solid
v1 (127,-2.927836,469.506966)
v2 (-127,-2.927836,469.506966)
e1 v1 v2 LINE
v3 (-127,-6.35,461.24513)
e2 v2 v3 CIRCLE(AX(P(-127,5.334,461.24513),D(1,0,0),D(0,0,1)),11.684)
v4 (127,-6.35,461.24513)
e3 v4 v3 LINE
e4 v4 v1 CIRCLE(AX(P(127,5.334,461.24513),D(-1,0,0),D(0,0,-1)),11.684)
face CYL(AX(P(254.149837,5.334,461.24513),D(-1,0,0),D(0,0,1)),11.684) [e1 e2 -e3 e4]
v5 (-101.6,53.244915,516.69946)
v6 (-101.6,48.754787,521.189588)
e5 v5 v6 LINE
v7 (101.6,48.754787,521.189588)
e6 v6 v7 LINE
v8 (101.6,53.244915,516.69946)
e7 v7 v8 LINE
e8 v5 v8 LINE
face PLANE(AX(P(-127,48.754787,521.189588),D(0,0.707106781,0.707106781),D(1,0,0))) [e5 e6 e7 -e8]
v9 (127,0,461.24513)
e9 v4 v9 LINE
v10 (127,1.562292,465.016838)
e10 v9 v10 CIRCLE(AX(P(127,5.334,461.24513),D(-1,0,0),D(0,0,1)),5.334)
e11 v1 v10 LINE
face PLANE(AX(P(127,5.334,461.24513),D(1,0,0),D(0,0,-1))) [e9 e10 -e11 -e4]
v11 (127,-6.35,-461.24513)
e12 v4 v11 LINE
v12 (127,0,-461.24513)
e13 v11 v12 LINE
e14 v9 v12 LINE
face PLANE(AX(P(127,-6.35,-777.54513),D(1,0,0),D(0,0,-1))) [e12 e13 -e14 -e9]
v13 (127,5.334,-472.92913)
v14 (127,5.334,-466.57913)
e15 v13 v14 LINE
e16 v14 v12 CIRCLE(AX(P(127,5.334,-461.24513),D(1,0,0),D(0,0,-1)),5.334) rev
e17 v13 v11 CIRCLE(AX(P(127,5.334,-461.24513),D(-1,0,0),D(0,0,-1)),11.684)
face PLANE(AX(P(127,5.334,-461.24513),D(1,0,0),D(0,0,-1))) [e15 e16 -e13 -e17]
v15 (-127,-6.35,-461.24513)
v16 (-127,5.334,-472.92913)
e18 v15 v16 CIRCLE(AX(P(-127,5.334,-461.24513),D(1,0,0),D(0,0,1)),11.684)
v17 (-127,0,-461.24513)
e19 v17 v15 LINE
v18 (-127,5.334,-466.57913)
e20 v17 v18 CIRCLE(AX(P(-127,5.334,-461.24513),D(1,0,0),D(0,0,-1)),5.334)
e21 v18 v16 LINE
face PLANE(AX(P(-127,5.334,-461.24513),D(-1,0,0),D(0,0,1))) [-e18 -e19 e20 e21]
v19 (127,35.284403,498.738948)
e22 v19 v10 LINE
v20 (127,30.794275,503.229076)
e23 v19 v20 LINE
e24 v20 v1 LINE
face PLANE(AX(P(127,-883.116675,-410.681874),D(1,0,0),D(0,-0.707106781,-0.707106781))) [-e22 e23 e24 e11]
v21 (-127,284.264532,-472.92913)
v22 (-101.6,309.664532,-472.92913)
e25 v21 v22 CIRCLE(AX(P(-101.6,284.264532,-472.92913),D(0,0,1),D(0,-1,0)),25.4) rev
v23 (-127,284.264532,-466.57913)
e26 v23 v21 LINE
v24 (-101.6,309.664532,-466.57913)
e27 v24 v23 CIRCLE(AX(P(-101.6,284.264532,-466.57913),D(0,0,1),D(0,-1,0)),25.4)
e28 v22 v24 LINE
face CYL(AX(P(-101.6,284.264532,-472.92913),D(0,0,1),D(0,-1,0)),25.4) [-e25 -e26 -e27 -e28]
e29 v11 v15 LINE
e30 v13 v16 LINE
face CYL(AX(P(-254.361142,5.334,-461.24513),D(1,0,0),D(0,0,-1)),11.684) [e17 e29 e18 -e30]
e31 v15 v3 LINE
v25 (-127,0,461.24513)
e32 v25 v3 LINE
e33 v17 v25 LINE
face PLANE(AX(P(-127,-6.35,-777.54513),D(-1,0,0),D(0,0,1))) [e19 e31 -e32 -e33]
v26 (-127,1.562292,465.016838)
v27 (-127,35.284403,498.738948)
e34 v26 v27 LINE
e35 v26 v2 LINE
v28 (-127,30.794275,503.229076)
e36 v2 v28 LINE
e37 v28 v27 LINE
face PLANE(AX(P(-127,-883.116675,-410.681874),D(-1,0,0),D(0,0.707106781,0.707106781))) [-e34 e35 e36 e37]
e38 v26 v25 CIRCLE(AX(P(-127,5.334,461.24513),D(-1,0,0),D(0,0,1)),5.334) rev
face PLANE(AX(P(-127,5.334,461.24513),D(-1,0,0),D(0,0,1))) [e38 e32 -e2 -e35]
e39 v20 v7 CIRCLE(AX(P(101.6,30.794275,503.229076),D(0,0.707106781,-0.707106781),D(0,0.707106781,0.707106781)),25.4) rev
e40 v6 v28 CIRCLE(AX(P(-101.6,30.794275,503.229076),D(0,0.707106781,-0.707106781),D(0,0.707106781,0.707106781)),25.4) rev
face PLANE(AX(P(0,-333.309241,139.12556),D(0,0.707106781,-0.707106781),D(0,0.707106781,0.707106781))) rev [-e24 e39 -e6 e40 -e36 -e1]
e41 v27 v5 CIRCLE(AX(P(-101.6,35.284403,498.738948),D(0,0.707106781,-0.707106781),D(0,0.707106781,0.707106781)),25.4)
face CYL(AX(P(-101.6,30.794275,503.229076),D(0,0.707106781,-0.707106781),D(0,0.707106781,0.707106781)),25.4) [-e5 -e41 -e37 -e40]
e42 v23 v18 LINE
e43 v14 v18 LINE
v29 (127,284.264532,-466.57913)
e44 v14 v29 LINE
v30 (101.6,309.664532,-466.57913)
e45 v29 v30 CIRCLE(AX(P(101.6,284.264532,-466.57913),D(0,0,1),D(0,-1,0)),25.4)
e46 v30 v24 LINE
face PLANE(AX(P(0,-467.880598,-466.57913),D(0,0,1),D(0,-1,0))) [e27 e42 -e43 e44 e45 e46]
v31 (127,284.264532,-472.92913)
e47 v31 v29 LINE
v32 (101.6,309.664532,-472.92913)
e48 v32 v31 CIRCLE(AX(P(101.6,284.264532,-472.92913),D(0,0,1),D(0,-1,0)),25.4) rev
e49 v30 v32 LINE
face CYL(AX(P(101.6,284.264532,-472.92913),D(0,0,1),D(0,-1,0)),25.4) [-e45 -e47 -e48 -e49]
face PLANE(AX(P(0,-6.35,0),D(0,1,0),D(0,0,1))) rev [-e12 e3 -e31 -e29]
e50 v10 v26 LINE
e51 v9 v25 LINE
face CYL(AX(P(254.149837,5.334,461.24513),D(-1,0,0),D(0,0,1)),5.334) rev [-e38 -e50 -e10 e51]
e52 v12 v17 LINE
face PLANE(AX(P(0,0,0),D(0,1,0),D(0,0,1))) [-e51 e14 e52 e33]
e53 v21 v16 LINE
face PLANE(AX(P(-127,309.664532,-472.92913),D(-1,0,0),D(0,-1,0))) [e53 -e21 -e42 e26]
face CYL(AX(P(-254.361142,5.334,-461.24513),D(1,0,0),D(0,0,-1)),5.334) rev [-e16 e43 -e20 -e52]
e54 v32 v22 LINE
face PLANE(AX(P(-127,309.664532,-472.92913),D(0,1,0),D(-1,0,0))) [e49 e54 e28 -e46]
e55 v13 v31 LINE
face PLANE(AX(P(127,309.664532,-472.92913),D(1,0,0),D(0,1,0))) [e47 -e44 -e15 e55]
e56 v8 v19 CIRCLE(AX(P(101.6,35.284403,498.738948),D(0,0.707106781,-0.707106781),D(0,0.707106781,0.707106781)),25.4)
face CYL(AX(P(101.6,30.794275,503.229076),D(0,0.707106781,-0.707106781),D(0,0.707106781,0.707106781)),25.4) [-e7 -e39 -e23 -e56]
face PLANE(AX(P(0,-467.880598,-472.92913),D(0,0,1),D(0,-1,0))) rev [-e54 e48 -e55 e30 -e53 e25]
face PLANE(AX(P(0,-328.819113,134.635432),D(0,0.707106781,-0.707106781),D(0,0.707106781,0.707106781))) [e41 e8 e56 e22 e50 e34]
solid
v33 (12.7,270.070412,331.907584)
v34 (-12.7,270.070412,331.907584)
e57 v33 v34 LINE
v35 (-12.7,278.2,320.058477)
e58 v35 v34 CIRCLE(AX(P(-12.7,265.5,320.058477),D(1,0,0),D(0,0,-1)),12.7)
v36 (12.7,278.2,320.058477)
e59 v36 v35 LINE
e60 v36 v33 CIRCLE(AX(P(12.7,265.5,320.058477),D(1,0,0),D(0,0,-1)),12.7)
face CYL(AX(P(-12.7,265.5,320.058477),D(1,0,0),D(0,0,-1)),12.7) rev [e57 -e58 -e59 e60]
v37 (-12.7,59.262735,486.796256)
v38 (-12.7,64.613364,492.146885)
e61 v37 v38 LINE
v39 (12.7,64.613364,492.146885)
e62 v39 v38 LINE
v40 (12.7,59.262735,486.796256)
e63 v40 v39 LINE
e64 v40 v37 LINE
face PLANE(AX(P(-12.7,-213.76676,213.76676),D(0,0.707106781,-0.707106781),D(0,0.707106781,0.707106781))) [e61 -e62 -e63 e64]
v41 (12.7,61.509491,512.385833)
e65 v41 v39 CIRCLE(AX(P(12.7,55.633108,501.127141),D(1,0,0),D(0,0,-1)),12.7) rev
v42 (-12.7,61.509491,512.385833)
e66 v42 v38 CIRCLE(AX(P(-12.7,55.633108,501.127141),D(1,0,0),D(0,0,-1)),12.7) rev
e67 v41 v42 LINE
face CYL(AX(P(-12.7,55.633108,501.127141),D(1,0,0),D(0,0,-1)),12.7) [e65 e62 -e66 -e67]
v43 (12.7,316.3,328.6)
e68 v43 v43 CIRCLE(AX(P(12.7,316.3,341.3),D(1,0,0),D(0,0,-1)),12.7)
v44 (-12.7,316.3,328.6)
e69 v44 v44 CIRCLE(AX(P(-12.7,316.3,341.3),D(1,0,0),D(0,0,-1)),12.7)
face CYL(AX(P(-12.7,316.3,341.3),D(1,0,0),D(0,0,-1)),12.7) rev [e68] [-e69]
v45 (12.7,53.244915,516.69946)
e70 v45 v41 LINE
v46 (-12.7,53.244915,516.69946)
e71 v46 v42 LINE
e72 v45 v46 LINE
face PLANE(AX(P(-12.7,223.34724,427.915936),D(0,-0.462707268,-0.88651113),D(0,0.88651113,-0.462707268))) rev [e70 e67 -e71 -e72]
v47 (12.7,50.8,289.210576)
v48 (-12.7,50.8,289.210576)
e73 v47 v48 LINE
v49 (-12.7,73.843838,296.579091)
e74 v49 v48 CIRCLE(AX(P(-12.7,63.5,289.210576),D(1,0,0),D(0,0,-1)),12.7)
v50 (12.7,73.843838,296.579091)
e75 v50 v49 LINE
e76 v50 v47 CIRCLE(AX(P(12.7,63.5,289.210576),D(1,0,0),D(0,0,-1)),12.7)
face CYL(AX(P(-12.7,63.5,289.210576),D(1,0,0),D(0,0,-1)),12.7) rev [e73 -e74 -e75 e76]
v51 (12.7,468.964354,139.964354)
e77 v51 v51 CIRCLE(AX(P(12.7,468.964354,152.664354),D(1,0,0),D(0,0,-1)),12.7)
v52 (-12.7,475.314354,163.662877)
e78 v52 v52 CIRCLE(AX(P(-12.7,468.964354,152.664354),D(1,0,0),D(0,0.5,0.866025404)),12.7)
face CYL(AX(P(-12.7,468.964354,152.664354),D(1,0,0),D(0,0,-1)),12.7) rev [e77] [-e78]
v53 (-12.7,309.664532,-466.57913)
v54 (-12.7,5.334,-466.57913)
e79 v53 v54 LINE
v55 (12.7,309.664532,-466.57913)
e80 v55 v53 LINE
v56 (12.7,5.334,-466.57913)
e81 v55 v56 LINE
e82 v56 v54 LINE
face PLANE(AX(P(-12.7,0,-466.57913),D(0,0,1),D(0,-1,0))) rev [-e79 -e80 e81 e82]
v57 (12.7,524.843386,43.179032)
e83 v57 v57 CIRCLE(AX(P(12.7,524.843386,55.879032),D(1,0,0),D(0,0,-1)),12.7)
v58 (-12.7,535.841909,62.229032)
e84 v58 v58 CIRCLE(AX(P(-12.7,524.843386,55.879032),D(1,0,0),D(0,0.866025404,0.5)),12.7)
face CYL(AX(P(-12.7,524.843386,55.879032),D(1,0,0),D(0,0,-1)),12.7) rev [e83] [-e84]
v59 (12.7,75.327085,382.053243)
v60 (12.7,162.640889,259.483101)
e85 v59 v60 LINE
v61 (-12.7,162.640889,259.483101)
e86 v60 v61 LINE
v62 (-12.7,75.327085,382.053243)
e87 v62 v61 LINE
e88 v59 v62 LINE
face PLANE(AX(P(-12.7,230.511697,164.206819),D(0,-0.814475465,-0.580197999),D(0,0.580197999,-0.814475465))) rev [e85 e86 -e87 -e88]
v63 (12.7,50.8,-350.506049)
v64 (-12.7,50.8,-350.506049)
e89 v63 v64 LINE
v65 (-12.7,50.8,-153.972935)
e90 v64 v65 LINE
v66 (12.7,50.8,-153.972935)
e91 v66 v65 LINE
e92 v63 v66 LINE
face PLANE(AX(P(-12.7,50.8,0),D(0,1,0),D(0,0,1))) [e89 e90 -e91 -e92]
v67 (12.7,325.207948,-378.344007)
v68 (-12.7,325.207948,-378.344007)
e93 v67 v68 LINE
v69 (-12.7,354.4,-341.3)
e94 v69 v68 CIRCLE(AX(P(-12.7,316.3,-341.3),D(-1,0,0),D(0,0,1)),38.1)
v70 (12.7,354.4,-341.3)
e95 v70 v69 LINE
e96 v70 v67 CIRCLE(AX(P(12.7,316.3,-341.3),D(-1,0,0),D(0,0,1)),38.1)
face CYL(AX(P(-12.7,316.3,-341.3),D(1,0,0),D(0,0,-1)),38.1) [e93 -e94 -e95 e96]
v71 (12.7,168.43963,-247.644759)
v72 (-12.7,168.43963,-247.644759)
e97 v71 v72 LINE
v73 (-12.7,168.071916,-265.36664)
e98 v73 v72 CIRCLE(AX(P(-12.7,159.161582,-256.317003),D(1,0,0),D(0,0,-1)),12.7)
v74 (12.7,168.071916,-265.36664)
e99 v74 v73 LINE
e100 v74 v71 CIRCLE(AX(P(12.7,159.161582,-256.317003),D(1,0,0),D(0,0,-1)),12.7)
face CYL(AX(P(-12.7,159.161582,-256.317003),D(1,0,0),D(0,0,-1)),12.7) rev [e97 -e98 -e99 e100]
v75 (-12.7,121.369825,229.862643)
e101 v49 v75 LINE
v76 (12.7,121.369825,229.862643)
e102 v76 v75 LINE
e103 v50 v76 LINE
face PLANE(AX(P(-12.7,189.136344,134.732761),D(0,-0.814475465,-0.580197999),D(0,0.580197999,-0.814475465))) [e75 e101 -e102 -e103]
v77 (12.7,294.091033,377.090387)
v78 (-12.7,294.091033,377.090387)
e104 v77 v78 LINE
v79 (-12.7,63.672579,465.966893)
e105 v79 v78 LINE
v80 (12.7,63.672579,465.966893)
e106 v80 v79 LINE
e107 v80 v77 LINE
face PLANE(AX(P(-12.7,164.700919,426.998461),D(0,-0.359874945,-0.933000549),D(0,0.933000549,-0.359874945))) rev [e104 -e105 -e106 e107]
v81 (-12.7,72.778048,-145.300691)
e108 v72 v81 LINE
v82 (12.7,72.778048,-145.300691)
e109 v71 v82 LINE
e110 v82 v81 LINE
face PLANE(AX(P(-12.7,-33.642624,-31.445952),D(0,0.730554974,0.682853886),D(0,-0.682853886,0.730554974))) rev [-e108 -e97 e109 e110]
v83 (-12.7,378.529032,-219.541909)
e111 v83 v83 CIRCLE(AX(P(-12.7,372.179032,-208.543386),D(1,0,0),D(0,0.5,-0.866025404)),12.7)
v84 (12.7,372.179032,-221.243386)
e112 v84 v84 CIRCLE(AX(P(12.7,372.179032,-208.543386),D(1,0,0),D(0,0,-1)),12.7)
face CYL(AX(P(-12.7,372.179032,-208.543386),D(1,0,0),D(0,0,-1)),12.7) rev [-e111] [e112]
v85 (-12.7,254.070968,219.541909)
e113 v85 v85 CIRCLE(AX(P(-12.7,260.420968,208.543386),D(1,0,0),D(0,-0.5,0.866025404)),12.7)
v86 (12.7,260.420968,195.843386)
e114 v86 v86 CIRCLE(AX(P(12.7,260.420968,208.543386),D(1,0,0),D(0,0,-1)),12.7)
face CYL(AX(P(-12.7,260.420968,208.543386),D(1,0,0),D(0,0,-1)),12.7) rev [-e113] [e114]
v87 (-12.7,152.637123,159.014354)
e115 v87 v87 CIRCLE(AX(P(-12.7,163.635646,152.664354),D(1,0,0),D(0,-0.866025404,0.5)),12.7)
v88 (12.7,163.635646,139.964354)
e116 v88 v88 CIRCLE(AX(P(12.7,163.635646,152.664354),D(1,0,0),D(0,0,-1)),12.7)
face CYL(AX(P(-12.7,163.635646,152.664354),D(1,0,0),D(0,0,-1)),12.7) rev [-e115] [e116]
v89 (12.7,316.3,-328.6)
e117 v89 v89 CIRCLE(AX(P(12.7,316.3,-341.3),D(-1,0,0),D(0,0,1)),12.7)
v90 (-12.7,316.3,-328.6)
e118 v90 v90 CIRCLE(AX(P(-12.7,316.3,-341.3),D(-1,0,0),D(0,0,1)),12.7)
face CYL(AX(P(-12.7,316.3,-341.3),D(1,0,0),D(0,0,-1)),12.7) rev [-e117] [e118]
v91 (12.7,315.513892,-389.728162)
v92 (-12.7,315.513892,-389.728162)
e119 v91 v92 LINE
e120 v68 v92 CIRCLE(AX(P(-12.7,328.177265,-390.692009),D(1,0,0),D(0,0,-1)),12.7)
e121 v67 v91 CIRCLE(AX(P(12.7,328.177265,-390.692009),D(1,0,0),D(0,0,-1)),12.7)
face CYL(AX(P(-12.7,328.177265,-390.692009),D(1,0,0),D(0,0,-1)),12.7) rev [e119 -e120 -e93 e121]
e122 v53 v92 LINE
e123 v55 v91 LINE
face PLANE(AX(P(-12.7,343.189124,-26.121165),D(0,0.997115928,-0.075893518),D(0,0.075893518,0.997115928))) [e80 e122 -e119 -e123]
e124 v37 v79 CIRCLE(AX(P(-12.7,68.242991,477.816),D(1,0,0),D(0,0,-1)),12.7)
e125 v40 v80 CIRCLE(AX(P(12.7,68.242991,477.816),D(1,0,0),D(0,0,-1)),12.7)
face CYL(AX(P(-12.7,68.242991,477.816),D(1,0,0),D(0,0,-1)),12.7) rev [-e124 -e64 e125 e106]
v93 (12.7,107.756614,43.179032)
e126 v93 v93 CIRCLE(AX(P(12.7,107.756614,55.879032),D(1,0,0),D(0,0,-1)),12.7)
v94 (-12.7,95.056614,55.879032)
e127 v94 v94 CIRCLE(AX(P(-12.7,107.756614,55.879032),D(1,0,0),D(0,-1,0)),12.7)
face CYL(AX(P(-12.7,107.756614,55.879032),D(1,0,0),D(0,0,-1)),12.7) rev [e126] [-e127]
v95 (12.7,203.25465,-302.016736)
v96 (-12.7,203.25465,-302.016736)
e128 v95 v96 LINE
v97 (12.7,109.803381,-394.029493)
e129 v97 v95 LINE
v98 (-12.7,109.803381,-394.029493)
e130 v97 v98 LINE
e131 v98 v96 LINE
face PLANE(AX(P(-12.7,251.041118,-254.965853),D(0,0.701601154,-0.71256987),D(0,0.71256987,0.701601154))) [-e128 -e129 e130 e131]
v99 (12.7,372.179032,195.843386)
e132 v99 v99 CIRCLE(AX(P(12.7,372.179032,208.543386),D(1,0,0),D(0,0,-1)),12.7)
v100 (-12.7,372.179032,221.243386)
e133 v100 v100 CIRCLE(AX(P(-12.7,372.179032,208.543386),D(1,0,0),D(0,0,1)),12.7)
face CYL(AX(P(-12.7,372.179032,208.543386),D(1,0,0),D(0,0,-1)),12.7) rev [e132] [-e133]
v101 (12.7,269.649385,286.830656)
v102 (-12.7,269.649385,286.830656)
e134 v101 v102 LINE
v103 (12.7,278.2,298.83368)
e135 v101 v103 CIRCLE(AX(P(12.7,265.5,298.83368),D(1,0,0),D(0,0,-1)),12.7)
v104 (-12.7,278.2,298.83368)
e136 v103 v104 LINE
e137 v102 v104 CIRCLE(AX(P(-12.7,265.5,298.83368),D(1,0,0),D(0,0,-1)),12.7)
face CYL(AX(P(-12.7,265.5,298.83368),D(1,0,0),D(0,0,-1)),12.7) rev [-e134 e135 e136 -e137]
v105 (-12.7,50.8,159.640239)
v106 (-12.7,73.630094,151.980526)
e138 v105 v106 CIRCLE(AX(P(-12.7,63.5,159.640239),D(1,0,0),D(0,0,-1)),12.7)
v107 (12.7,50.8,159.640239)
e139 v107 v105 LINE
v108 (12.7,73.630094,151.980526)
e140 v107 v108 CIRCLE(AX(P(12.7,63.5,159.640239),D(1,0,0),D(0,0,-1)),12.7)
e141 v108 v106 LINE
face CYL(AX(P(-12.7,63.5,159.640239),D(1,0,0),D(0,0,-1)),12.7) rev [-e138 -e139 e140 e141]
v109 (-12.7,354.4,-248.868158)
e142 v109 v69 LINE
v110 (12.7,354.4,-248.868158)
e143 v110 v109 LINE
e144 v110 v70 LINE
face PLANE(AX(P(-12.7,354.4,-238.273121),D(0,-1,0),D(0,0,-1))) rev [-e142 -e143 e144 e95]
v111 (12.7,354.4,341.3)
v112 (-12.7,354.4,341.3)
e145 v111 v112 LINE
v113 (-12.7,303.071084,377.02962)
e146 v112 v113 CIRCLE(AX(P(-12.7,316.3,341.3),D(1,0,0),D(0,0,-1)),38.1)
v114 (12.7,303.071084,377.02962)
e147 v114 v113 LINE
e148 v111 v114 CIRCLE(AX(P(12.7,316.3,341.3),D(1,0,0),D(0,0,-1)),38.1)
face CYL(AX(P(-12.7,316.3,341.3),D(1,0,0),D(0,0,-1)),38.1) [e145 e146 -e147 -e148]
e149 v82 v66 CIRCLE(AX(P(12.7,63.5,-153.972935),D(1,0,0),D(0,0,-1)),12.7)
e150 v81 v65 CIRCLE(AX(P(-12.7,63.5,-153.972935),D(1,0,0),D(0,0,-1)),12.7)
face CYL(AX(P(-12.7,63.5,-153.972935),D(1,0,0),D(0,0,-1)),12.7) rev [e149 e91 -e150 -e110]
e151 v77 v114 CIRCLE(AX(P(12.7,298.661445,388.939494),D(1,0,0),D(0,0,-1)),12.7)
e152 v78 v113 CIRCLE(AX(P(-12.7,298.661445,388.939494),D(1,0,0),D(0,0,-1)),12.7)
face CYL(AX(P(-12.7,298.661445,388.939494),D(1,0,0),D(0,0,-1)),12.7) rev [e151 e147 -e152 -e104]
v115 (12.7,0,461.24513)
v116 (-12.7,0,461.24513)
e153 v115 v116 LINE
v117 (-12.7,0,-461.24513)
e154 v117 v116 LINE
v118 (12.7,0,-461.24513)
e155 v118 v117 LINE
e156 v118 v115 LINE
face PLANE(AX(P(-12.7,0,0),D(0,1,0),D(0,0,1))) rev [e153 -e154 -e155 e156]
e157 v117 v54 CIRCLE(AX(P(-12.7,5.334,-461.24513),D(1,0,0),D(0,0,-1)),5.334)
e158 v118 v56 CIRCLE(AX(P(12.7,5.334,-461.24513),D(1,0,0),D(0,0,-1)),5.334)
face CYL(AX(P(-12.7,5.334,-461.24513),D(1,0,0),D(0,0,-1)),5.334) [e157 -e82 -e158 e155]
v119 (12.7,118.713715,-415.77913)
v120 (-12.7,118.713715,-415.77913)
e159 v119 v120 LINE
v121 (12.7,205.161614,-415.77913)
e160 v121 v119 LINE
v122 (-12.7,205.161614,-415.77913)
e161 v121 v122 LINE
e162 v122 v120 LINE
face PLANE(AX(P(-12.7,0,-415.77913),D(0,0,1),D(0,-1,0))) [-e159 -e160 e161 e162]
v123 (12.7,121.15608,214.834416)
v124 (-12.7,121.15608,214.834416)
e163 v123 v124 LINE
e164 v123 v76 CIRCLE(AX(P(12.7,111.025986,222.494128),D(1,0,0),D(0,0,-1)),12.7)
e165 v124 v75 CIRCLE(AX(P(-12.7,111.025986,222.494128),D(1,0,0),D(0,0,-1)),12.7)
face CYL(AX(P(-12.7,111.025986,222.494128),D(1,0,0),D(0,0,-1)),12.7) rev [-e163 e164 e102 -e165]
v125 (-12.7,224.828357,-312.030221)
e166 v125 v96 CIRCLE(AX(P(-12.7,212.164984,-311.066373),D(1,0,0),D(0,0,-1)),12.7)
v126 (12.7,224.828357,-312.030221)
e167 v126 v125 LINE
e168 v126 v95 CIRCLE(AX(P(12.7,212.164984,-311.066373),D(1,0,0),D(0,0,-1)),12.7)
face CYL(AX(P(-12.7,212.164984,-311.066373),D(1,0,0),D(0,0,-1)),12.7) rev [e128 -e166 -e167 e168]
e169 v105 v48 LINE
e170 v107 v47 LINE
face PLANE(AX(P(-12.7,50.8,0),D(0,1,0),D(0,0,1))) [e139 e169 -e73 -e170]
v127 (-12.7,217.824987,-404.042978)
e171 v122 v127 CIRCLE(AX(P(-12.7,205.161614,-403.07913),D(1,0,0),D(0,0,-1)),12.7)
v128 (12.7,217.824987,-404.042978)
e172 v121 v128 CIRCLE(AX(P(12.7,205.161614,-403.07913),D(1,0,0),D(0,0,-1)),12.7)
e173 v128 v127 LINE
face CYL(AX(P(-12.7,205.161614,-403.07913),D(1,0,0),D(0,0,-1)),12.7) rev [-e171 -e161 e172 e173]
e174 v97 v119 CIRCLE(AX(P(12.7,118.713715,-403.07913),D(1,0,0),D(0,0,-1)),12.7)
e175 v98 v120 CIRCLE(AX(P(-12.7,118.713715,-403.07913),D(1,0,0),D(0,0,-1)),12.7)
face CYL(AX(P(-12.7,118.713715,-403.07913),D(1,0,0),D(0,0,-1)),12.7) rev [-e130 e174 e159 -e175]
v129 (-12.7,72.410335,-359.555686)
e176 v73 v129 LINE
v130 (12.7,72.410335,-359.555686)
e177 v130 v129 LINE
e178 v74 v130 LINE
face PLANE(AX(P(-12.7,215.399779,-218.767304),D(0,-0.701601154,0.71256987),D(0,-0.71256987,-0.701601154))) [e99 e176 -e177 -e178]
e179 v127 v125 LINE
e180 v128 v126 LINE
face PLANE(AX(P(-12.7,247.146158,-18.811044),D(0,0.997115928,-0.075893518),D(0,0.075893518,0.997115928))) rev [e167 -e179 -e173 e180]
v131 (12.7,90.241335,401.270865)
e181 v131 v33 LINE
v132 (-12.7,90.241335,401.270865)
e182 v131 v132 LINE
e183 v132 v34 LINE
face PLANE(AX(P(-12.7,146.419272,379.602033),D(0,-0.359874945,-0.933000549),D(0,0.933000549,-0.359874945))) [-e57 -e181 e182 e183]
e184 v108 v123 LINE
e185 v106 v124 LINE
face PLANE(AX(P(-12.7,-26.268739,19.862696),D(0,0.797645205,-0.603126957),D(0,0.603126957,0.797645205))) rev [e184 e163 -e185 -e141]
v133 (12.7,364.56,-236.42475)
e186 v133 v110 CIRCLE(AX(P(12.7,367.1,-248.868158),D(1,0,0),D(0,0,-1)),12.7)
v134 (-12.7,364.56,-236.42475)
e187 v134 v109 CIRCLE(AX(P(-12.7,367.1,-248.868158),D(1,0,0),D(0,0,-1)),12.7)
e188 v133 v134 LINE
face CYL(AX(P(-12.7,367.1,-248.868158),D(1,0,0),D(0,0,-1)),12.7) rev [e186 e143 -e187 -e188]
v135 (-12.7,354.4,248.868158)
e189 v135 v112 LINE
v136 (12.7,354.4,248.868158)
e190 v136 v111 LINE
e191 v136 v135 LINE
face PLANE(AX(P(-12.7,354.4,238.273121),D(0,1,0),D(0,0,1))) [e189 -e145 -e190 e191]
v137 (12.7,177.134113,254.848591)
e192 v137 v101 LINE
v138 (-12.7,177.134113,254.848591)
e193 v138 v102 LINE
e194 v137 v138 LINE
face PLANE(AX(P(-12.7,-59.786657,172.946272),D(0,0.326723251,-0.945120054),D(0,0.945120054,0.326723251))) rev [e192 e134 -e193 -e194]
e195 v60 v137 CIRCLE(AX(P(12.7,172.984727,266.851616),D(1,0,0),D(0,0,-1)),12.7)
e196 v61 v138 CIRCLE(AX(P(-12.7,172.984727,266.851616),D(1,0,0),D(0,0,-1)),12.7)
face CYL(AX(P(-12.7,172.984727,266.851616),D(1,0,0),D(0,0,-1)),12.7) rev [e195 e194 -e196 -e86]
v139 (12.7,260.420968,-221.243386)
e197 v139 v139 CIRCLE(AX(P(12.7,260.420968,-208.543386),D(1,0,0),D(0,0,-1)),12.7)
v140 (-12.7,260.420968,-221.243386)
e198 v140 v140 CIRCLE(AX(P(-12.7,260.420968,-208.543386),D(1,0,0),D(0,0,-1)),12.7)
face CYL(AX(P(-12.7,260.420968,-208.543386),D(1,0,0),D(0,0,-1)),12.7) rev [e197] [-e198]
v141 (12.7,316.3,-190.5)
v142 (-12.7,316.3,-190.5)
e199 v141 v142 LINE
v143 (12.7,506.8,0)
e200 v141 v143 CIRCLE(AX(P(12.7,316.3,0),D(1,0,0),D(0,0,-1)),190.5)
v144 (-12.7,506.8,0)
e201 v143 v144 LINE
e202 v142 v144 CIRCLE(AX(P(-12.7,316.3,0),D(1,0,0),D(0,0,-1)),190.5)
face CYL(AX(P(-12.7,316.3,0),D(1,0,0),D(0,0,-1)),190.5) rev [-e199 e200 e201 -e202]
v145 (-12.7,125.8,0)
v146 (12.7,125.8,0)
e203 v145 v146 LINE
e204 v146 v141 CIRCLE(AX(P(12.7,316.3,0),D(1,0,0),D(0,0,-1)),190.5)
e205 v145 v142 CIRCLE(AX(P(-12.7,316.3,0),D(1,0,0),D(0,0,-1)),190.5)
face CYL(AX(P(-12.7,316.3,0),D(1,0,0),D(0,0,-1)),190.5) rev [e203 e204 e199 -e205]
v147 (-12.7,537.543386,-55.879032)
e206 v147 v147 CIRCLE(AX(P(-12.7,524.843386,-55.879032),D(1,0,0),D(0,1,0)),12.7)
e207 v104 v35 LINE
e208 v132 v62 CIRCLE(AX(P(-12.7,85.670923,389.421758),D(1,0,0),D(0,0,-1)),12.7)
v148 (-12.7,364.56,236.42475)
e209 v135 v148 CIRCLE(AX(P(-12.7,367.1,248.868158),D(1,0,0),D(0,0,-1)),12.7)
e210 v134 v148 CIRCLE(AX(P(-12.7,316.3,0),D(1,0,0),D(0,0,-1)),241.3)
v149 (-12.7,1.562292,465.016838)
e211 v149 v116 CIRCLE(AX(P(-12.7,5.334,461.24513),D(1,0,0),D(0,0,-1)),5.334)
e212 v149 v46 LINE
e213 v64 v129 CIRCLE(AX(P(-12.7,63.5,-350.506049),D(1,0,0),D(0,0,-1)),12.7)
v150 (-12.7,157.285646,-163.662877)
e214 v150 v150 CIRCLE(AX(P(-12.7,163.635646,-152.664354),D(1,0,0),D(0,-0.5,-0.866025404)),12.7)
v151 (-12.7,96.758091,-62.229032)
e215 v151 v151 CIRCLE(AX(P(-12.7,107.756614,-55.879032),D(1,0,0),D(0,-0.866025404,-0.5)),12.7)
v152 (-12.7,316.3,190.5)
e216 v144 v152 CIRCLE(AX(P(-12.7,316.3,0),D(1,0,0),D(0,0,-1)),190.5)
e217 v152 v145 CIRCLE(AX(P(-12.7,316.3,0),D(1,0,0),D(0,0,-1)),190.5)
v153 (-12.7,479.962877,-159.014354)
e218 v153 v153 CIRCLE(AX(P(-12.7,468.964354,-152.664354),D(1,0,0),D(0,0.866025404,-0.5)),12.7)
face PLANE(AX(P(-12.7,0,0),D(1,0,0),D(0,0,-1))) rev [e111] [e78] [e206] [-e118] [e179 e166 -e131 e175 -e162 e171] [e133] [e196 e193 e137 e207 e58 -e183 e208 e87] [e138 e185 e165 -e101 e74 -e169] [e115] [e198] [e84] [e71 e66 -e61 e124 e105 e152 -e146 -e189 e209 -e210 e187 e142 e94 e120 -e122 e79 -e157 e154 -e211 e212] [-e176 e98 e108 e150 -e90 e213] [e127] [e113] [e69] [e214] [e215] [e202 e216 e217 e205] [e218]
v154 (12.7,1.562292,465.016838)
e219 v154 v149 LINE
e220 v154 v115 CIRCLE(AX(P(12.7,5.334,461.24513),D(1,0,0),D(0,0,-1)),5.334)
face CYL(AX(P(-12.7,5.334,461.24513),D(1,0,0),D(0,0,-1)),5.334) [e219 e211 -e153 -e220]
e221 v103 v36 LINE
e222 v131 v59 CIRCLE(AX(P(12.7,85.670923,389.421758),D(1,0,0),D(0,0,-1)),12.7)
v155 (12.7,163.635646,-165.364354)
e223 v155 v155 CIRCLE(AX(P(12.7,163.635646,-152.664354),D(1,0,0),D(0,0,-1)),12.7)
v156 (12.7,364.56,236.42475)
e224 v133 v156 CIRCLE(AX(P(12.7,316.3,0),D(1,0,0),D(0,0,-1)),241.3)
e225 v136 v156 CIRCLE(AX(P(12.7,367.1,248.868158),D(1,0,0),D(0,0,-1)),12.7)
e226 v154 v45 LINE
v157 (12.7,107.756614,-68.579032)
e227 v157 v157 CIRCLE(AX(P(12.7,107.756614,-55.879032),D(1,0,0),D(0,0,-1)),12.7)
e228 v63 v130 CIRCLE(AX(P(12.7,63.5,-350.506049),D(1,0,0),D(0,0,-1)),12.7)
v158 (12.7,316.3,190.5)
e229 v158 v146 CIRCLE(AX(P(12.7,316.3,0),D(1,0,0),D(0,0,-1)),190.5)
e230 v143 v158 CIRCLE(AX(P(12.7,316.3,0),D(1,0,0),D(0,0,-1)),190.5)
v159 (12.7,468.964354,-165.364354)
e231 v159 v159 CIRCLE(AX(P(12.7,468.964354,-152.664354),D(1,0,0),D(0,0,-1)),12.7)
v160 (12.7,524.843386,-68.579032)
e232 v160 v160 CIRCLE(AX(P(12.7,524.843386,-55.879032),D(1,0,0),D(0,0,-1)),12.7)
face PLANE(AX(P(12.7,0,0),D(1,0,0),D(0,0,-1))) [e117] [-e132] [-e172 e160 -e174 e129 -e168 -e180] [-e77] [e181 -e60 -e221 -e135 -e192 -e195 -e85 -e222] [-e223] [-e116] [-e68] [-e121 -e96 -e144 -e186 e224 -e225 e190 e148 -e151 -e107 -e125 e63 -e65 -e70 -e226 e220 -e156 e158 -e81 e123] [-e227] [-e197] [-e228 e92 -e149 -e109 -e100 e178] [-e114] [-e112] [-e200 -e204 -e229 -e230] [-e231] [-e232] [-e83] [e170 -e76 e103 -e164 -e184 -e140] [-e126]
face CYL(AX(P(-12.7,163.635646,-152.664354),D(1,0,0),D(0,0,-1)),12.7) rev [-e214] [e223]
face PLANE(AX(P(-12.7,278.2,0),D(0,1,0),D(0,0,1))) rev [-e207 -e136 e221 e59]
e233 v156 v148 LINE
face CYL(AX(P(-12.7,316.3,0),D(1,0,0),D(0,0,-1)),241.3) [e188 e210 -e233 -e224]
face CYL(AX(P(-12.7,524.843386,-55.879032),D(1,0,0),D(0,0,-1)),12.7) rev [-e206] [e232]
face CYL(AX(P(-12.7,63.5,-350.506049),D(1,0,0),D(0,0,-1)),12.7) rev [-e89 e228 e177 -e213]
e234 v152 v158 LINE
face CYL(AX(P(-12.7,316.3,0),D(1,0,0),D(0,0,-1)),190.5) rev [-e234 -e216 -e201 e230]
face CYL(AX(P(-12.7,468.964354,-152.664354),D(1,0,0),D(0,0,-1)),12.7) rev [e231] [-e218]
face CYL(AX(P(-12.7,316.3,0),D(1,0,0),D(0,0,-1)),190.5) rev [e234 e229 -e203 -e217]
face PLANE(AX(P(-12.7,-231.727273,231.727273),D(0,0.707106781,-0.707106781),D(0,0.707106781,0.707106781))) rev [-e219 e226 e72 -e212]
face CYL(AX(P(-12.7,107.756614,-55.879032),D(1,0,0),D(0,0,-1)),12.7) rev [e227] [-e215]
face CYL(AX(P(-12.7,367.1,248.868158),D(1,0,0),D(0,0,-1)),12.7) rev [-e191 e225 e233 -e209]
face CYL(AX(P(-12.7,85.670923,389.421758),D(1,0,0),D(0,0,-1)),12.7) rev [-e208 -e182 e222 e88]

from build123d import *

# Parameters (mm, degrees)
FLANGE_PROFILE_DEPTH                = 12.7
F_7_8_1_DIAMETER_HOLE1_D            = 25.4
BOLT_PATTERN_COUNT                  = 12
SKETCH15_R                          = 12.7
BOSS_EXTRUDE1_DEPTH                 = 12.7
SKETCH5_W                           = 254
SKETCH5_H                           = 1317.865260112
BASE_SKID_DEPTH                     = 6.35
BEND_START                          = -127
BEND_HEEL_DEPTH                     = 254
BEND_HEEL_2_DEPTH                   = 254
BEND_TOE_DEPTH                      = 254
BEND_TOE_2_DEPTH                    = 254
WEBBING_BODY_DEPTH                  = 12.7
WEBBING_HOLES_DEPTH                 = 774.747599071
WEBBING_HOLES_DEPTH_BACK            = 774.747599071
WEBBING_FILLET_R                    = 12.7
SKID_START                          = -472.929130056
SKID_EDGES_DEPTH                    = 6.35
SKID_START_2                        = -334.061851681
SKID_EDGES_2_DEPTH                  = 6.35
FLANGE_FILLET_R                     = 12.7
FILLET1_R                           = 12.7
CONVERT_START                       = -12.7
CONVERT_FLANGE_TO_SHEET_OUTLINE_R   = 12.7
CONVERT_FLANGE_TO_SHEET_OUTLINE_R_2 = 190.5
CONVERT_FLANGE_TO_SHEET_DEPTH       = 25.4


# Read off the part's stored shape, not the designer's step: Bend Heel, Bend Toe, Skid Edges, Convert Flange to Sheet
# Sheet-metal steps are written as plain solids
with BuildPart() as part:
    # Sketch1 → Flange Profile (new, symmetric)
    with BuildSketch(Plane(origin=(0, 0, 0), x_dir=(0, 0, -1), z_dir=(1, 0, 0))):
        with BuildLine():
            ThreePointArc((-190.5, 316.3), (0, 506.8), (190.5, 316.3))
            Line((190.5, 316.3), (241.3, 316.3))
            ThreePointArc((241.3, 316.3), (0, 557.6), (-241.3, 316.3))
            Line((-241.3, 316.3), (-190.5, 316.3))
        make_face()
        with BuildLine():
            Line((241.3, 316.3), (190.5, 316.3))
            ThreePointArc((190.5, 316.3), (0, 125.8), (-190.5, 316.3))
            Line((-190.5, 316.3), (-241.3, 316.3))
            ThreePointArc((-241.3, 316.3), (0, 75), (241.3, 316.3))
        make_face()
    extrude(amount=FLANGE_PROFILE_DEPTH, both=True)

    # 7/8 (1) Diameter Hole1 (through all)
    with Locations(Plane(origin=(12.7, 260.420968162, -208.543385896), x_dir=(0, 0, 1), z_dir=(1, 0, 0))):
        with Locations((0, 0)):
            f_7_8_1_diameter_hole1 = Hole(F_7_8_1_DIAMETER_HOLE1_D / 2)

    # Bolt Pattern: 7/8 (1) Diameter Hole1 ×12 about axis
    bolt_pattern_axis = Axis((0, 316.3, 0), (1, 0, 0))
    for i in range(1, BOLT_PATTERN_COUNT):
        add(f_7_8_1_diameter_hole1.rotate(bolt_pattern_axis, i * 360 / BOLT_PATTERN_COUNT), mode=Mode.SUBTRACT)

    # Sketch15 → Boss-Extrude1 (add, symmetric)
    with BuildSketch(Plane(origin=(0, 0, 0), x_dir=(0, 0, -1), z_dir=(1, 0, 0))):
        with BuildLine():
            Line((-238.273120599, 278.2), (-341.3, 278.2))
            ThreePointArc((-341.3, 278.2), (-379.4, 316.3), (-341.3, 354.4))
            Line((-341.3, 354.4), (-238.273120599, 354.4))
            ThreePointArc((-238.273120599, 354.4), (-200.173120599, 316.3), (-238.273120599, 278.2))
        make_face()
        with Locations((-341.3, 316.3)):
            Circle(SKETCH15_R, mode=Mode.SUBTRACT)
    boss_extrude1 = extrude(amount=BOSS_EXTRUDE1_DEPTH, both=True)

    # Mirror2: Boss-Extrude1 across plane
    add(boss_extrude1.mirror(Plane.XY))

    # Sketch12 → Webbing Body (add, symmetric)
    with BuildSketch(Plane(origin=(0, 0, 0), x_dir=(0, 0, -1), z_dir=(1, 0, 0))):
        with BuildLine():
            Line((-516.69946035, 53.244915153), (-465.016837626, 1.562292429))
            ThreePointArc((-465.016837626, 1.562292429), (-463.286363484, 0.406026574), (-461.245130056, 0))
            Line((-461.245130056, 0), (461.245130056, 0))
            ThreePointArc((461.245130056, 0), (465.016837626, 1.562292429), (466.579130056, 5.334))
            Line((466.579130056, 5.334), (466.579130056, 309.66453199))
            Line((466.579130056, 309.66453199), (379.4, 316.3))
            ThreePointArc((379.4, 316.3), (368.240768363, 289.359231637), (341.3, 278.2))
            Line((341.3, 278.2), (238.273120599, 278.2))
            ThreePointArc((238.273120599, 278.2), (0, 75), (-238.273120599, 278.2))
            Line((-238.273120599, 278.2), (-341.3, 278.2))
            ThreePointArc((-341.3, 278.2), (-368.240768363, 289.359231637), (-379.4, 316.3))
            Line((-379.4, 316.3), (-516.69946035, 53.244915153))
        make_face()
    extrude(amount=WEBBING_BODY_DEPTH, both=True)

    # Sketch13 → Webbing Holes (cut, two sides: drawn at the far end of the back side and taken through both)
    with BuildSketch(Plane(origin=(0, 0, 0), x_dir=(0, 0, -1), z_dir=(1, 0, 0)).offset(-WEBBING_HOLES_DEPTH_BACK)):
        Polygon((-121.787355666, 50.8), (-328.927773528, 50.8), (-222.270083081, 126.778444056), align=None)
        Polygon((256.684840666, 176.88944598), (380.833369116, 50.8), (121.787355666, 50.8), align=None)
        Polygon((415.779130056, 216.93171249), (415.779130056, 87.713713005), (278.243059213, 227.4), align=None)
        Polygon((-416.484090731, 50.8), (-251.744141406, 168.15379766), (-289.7865603, 278.2), (-328.771856678, 278.2), align=None)
        with BuildLine():
            Line((-504.380536196, 76.847015483), (-379.4, 316.3))
            ThreePointArc((-379.4, 316.3), (-378.339738675, 307.374320256), (-375.217965412, 298.945414949))
            Line((-375.217965412, 298.945414949), (-472.992285501, 45.458764788))
            Line((-472.992285501, 45.458764788), (-504.380536196, 76.847015483))
        make_face()
    extrude(amount=WEBBING_HOLES_DEPTH + WEBBING_HOLES_DEPTH_BACK, mode=Mode.SUBTRACT)

    # Webbing Fillet
    webbing_fillet_edges = [part.edges().sort_by_distance(p)[0] for p in [
        (0, 50.8, 416.484090731),
        (0, 278.2, 328.771856678),
        (0, 278.2, 289.7865603),
        (0, 168.15379766, 251.744141406),
        (0, 176.88944598, -256.684840666),
        (0, 50.8, -380.833369116),
        (0, 50.8, -121.787355666),
        (0, 216.93171249, -415.779130056),
        (0, 87.713713005, -415.779130056),
        (0, 227.4, -278.243059213),
        (0, 50.8, 121.787355666),
        (0, 50.8, 328.927773528),
        (0, 126.778444056, 222.270083081),
    ]]
    fillet(webbing_fillet_edges, radius=WEBBING_FILLET_R)

    # Flange Fillet
    flange_fillet_edges = [part.edges().sort_by_distance(p)[0] for p in [
        (0, 298.945414949, 375.217965412),
        (0, 354.4, 238.273120599),
        (0, 354.4, -238.273120599),
        (0, 316.3, -379.4),
    ]]
    fillet(flange_fillet_edges, radius=FLANGE_FILLET_R)

    # Fillet1
    fillet1_edges = [part.edges().sort_by_distance(p)[0] for p in [
        (0, 76.847015483, 504.380536196),
        (0, 45.458764788, 472.992285501),
    ]]
    fillet(fillet1_edges, radius=FILLET1_R)


with BuildPart() as body_2:
    # Sketch5 → Base Skid (new body)
    with BuildSketch(Plane(origin=(0, 0, 0), x_dir=(1, 0, 0), z_dir=(0, 1, 0))):
        with Locations((0, 118.6125)):
            Rectangle(SKETCH5_W, SKETCH5_H)
    extrude(amount=-BASE_SKID_DEPTH)

    # Bend Heel outline → Bend Heel (cut)
    with BuildSketch(Plane.YZ.offset(BEND_START)):
        with BuildLine():
            Line((0, -777.545130056), (0, -471.640528076))
            ThreePointArc((0, -471.640528076), (-4.636915504, -467.33583609), (-6.35, -461.245130056))
            Line((-6.35, -461.245130056), (-6.35, -777.545130056))
            Line((-6.35, -777.545130056), (0, -777.545130056))
        make_face()
    extrude(amount=BEND_HEEL_DEPTH, mode=Mode.SUBTRACT)

    # Bend Heel 2 outline → Bend Heel 2 (add)
    with BuildSketch(Plane.YZ.offset(BEND_START)):
        with BuildLine():
            Line((5.334, -472.929130056), (309.66453199, -472.929130056))
            Line((309.66453199, -472.929130056), (309.66453199, -466.579130056))
            Line((309.66453199, -466.579130056), (5.334, -466.579130056))
            ThreePointArc((5.334, -466.579130056), (1.56229243, -465.016837626), (0, -461.245130056))
            Line((0, -461.245130056), (0, -471.640528076))
            ThreePointArc((0, -471.640528076), (2.590277571, -472.602411563), (5.334, -472.929130056))
        make_face()
    extrude(amount=BEND_HEEL_2_DEPTH)

    # Bend Toe outline → Bend Toe (cut)
    with BuildSketch(Plane.YZ.offset(BEND_START)):
        with BuildLine():
            Line((-6.35, 540.320130056), (-6.35, 461.245130056))
            ThreePointArc((-6.35, 461.245130056), (-5.460608458, 465.71640328), (-2.927835631, 469.506965687))
            Line((-2.927835631, 469.506965687), (0, 472.434801318))
            Line((0, 472.434801318), (0, 540.320130056))
            Line((0, 540.320130056), (-6.35, 540.320130056))
        make_face()
    extrude(amount=BEND_TOE_DEPTH, mode=Mode.SUBTRACT)

    # Bend Toe 2 outline → Bend Toe 2 (add)
    with BuildSketch(Plane.YZ.offset(BEND_START)):
        with BuildLine():
            Line((48.754787092, 521.189588411), (0, 472.434801318))
            Line((0, 472.434801318), (0, 461.245130056))
            ThreePointArc((0, 461.245130056), (0.406026574, 463.286363484), (1.562292429, 465.016837626))
            Line((1.562292429, 465.016837626), (53.244915153, 516.69946035))
            Line((53.244915153, 516.69946035), (48.754787092, 521.189588411))
        make_face()
    extrude(amount=BEND_TOE_2_DEPTH)

    # Skid Edges outline → Skid Edges (cut)
    with BuildSketch(Plane.XY.offset(SKID_START)):
        with BuildLine():
            ThreePointArc((-127, 284.26453199), (-119.560512242, 302.225044232), (-101.6, 309.66453199))
            Line((-101.6, 309.66453199), (-127, 309.66453199))
            Line((-127, 309.66453199), (-127, 284.26453199))
        make_face()
        with BuildLine():
            ThreePointArc((101.6, 309.66453199), (119.560512242, 302.225044232), (127, 284.26453199))
            Line((127, 284.26453199), (127, 309.66453199))
            Line((127, 309.66453199), (101.6, 309.66453199))
        make_face()
    extrude(amount=SKID_EDGES_DEPTH, mode=Mode.SUBTRACT)

    # Skid Edges 2 outline → Skid Edges 2 (cut)
    with BuildSketch(Plane(origin=(0, 0, 0), x_dir=(1, 0, 0), z_dir=(0, 0.707106781186546, -0.707106781186549)).offset(SKID_START_2)):
        with BuildLine():
            Line((-127, -403.011532817), (-101.6, -403.011532817))
            ThreePointArc((-101.6, -403.011532817), (-119.560512242, -395.572045059), (-127, -377.611532817))
            Line((-127, -377.611532817), (-127, -403.011532817))
        make_face()
        with BuildLine():
            ThreePointArc((127, -377.611532817), (119.560512242, -395.572045059), (101.6, -403.011532817))
            Line((101.6, -403.011532817), (127, -403.011532817))
            Line((127, -403.011532817), (127, -377.611532817))
        make_face()
    extrude(amount=SKID_EDGES_2_DEPTH, mode=Mode.SUBTRACT)


with BuildPart() as body_3:
    # Convert Flange to Sheet outline → Convert Flange to Sheet (new body)
    with BuildSketch(Plane.YZ.offset(CONVERT_START)):
        with BuildLine():
            ThreePointArc((64.613364326, 492.146885039), (68.186341854, 503.052322953), (61.509490514, 512.385832512))
            Line((61.509490514, 512.385832512), (53.244915153, 516.69946035))
            Line((53.244915153, 516.69946035), (1.562292429, 465.016837626))
            ThreePointArc((1.562292429, 465.016837626), (0.406026574, 463.286363484), (0, 461.245130056))
            Line((0, 461.245130056), (0, -461.245130056))
            ThreePointArc((0, -461.245130056), (1.56229243, -465.016837626), (5.334, -466.579130056))
            Line((5.334, -466.579130056), (309.66453199, -466.579130056))
            Line((309.66453199, -466.579130056), (315.51389229, -389.728161662))
            ThreePointArc((315.51389229, -389.728161662), (318.507984292, -382.458236277), (325.207948432, -378.344007002))
            ThreePointArc((325.207948432, -378.344007002), (346.224929701, -364.881954592), (354.4, -341.3))
            Line((354.4, -341.3), (354.4, -248.868157867))
            ThreePointArc((354.4, -248.868157867), (357.262622301, -240.83597261), (364.56, -236.424749973))
            ThreePointArc((364.56, -236.424749973), (557.6, 0), (364.56, 236.424749973))
            ThreePointArc((364.56, 236.424749973), (357.262622301, 240.83597261), (354.4, 248.868157867))
            Line((354.4, 248.868157867), (354.4, 341.3))
            ThreePointArc((354.4, 341.3), (338.066812973, 372.570047218), (303.071083831, 377.029620443))
            ThreePointArc((303.071083831, 377.029620443), (298.575508282, 376.239784681), (294.091033306, 377.090386955))
            Line((294.091033306, 377.090386955), (63.672579247, 465.966892551))
            ThreePointArc((63.672579247, 465.966892551), (55.818388763, 475.185551264), (59.262734928, 486.796255641))
            Line((59.262734928, 486.796255641), (64.613364326, 492.146885039))
        make_face()
        with BuildLine():
            ThreePointArc((168.439629954, -247.644758669), (171.858848828, -256.580460186), (168.071916446, -265.366640382))
            Line((168.071916446, -265.366640382), (72.410334659, -359.555686227))
            ThreePointArc((72.410334659, -359.555686227), (58.594454677, -362.220383043), (50.8, -350.506048871))
            Line((50.8, -350.506048871), (50.8, -153.972935338))
            ThreePointArc((50.8, -153.972935338), (58.838520177, -142.159358155), (72.778048167, -145.30069098))
            Line((72.778048167, -145.30069098), (168.439629954, -247.644758669))
        make_face(mode=Mode.SUBTRACT)
        with BuildLine():
            ThreePointArc((217.82498664, -404.042977729), (213.794375631, -412.393926496), (205.161614354, -415.779130056))
            Line((205.161614354, -415.779130056), (118.713715248, -415.779130056))
            ThreePointArc((118.713715248, -415.779130056), (106.961685755, -407.893670822), (109.803380589, -394.0294927))
            Line((109.803380589, -394.0294927), (203.254649706, -302.016735785))
            ThreePointArc((203.254649706, -302.016735785), (217.511833293, -299.546772169), (224.828356651, -312.030220814))
            Line((224.828356651, -312.030220814), (217.82498664, -404.042977729))
        make_face(mode=Mode.SUBTRACT)
        with Locations((107.756614104, -55.879031838)):
            Circle(CONVERT_FLANGE_TO_SHEET_OUTLINE_R, mode=Mode.SUBTRACT)
        with Locations((163.635645942, -152.664354058)):
            Circle(CONVERT_FLANGE_TO_SHEET_OUTLINE_R, mode=Mode.SUBTRACT)
        with Locations((260.420968162, -208.543385896)):
            Circle(CONVERT_FLANGE_TO_SHEET_OUTLINE_R, mode=Mode.SUBTRACT)
        with Locations((316.3, -341.3)):
            Circle(CONVERT_FLANGE_TO_SHEET_OUTLINE_R, mode=Mode.SUBTRACT)
        with Locations((372.179031838, -208.543385896)):
            Circle(CONVERT_FLANGE_TO_SHEET_OUTLINE_R, mode=Mode.SUBTRACT)
        with Locations((316.3, 0)):
            Circle(CONVERT_FLANGE_TO_SHEET_OUTLINE_R_2, mode=Mode.SUBTRACT)
        with Locations((468.964354058, -152.664354058)):
            Circle(CONVERT_FLANGE_TO_SHEET_OUTLINE_R, mode=Mode.SUBTRACT)
        with Locations((524.843385896, -55.879031838)):
            Circle(CONVERT_FLANGE_TO_SHEET_OUTLINE_R, mode=Mode.SUBTRACT)
        with Locations((107.756614104, 55.879031838)):
            Circle(CONVERT_FLANGE_TO_SHEET_OUTLINE_R, mode=Mode.SUBTRACT)
        with BuildLine():
            ThreePointArc((73.630094109, 151.980526264), (59.460333874, 147.599844206), (50.8, 159.640238618))
            Line((50.8, 159.640238618), (50.8, 289.210576193))
            ThreePointArc((50.8, 289.210576193), (59.631973868, 301.307202741), (73.843838401, 296.579090775))
            Line((73.843838401, 296.579090775), (121.36982462, 229.862642585))
            ThreePointArc((121.36982462, 229.862642585), (123.724701875, 222.313516013), (121.156080328, 214.83441565))
            Line((121.156080328, 214.83441565), (73.630094109, 151.980526264))
        make_face(mode=Mode.SUBTRACT)
        with Locations((163.635645942, 152.664354058)):
            Circle(CONVERT_FLANGE_TO_SHEET_OUTLINE_R, mode=Mode.SUBTRACT)
        with Locations((260.420968162, 208.543385896)):
            Circle(CONVERT_FLANGE_TO_SHEET_OUTLINE_R, mode=Mode.SUBTRACT)
        with BuildLine():
            ThreePointArc((75.327084944, 382.053243061), (75.637860095, 397.208133038), (90.241335147, 401.270864611))
            Line((90.241335147, 401.270864611), (270.070411802, 331.907583779))
            ThreePointArc((270.070411802, 331.907583779), (275.972206785, 327.243383564), (278.2, 320.05847681))
            Line((278.2, 320.05847681), (278.2, 298.833680473))
            ThreePointArc((278.2, 298.833680473), (275.843770908, 291.465071146), (269.64938529, 286.830655782))
            Line((269.64938529, 286.830655782), (177.134112511, 254.848591102))
            ThreePointArc((177.134112511, 254.848591102), (169.116590289, 254.755024674), (162.64088882, 259.48310121))
            Line((162.64088882, 259.48310121), (75.327084944, 382.053243061))
        make_face(mode=Mode.SUBTRACT)
        with Locations((372.179031838, 208.543385896)):
            Circle(CONVERT_FLANGE_TO_SHEET_OUTLINE_R, mode=Mode.SUBTRACT)
        with Locations((524.843385896, 55.879031838)):
            Circle(CONVERT_FLANGE_TO_SHEET_OUTLINE_R, mode=Mode.SUBTRACT)
        with Locations((468.964354058, 152.664354058)):
            Circle(CONVERT_FLANGE_TO_SHEET_OUTLINE_R, mode=Mode.SUBTRACT)
        with Locations((316.3, 341.3)):
            Circle(CONVERT_FLANGE_TO_SHEET_OUTLINE_R, mode=Mode.SUBTRACT)
    extrude(amount=CONVERT_FLANGE_TO_SHEET_DEPTH)


solid = Compound([body_2.part, body_3.part])
